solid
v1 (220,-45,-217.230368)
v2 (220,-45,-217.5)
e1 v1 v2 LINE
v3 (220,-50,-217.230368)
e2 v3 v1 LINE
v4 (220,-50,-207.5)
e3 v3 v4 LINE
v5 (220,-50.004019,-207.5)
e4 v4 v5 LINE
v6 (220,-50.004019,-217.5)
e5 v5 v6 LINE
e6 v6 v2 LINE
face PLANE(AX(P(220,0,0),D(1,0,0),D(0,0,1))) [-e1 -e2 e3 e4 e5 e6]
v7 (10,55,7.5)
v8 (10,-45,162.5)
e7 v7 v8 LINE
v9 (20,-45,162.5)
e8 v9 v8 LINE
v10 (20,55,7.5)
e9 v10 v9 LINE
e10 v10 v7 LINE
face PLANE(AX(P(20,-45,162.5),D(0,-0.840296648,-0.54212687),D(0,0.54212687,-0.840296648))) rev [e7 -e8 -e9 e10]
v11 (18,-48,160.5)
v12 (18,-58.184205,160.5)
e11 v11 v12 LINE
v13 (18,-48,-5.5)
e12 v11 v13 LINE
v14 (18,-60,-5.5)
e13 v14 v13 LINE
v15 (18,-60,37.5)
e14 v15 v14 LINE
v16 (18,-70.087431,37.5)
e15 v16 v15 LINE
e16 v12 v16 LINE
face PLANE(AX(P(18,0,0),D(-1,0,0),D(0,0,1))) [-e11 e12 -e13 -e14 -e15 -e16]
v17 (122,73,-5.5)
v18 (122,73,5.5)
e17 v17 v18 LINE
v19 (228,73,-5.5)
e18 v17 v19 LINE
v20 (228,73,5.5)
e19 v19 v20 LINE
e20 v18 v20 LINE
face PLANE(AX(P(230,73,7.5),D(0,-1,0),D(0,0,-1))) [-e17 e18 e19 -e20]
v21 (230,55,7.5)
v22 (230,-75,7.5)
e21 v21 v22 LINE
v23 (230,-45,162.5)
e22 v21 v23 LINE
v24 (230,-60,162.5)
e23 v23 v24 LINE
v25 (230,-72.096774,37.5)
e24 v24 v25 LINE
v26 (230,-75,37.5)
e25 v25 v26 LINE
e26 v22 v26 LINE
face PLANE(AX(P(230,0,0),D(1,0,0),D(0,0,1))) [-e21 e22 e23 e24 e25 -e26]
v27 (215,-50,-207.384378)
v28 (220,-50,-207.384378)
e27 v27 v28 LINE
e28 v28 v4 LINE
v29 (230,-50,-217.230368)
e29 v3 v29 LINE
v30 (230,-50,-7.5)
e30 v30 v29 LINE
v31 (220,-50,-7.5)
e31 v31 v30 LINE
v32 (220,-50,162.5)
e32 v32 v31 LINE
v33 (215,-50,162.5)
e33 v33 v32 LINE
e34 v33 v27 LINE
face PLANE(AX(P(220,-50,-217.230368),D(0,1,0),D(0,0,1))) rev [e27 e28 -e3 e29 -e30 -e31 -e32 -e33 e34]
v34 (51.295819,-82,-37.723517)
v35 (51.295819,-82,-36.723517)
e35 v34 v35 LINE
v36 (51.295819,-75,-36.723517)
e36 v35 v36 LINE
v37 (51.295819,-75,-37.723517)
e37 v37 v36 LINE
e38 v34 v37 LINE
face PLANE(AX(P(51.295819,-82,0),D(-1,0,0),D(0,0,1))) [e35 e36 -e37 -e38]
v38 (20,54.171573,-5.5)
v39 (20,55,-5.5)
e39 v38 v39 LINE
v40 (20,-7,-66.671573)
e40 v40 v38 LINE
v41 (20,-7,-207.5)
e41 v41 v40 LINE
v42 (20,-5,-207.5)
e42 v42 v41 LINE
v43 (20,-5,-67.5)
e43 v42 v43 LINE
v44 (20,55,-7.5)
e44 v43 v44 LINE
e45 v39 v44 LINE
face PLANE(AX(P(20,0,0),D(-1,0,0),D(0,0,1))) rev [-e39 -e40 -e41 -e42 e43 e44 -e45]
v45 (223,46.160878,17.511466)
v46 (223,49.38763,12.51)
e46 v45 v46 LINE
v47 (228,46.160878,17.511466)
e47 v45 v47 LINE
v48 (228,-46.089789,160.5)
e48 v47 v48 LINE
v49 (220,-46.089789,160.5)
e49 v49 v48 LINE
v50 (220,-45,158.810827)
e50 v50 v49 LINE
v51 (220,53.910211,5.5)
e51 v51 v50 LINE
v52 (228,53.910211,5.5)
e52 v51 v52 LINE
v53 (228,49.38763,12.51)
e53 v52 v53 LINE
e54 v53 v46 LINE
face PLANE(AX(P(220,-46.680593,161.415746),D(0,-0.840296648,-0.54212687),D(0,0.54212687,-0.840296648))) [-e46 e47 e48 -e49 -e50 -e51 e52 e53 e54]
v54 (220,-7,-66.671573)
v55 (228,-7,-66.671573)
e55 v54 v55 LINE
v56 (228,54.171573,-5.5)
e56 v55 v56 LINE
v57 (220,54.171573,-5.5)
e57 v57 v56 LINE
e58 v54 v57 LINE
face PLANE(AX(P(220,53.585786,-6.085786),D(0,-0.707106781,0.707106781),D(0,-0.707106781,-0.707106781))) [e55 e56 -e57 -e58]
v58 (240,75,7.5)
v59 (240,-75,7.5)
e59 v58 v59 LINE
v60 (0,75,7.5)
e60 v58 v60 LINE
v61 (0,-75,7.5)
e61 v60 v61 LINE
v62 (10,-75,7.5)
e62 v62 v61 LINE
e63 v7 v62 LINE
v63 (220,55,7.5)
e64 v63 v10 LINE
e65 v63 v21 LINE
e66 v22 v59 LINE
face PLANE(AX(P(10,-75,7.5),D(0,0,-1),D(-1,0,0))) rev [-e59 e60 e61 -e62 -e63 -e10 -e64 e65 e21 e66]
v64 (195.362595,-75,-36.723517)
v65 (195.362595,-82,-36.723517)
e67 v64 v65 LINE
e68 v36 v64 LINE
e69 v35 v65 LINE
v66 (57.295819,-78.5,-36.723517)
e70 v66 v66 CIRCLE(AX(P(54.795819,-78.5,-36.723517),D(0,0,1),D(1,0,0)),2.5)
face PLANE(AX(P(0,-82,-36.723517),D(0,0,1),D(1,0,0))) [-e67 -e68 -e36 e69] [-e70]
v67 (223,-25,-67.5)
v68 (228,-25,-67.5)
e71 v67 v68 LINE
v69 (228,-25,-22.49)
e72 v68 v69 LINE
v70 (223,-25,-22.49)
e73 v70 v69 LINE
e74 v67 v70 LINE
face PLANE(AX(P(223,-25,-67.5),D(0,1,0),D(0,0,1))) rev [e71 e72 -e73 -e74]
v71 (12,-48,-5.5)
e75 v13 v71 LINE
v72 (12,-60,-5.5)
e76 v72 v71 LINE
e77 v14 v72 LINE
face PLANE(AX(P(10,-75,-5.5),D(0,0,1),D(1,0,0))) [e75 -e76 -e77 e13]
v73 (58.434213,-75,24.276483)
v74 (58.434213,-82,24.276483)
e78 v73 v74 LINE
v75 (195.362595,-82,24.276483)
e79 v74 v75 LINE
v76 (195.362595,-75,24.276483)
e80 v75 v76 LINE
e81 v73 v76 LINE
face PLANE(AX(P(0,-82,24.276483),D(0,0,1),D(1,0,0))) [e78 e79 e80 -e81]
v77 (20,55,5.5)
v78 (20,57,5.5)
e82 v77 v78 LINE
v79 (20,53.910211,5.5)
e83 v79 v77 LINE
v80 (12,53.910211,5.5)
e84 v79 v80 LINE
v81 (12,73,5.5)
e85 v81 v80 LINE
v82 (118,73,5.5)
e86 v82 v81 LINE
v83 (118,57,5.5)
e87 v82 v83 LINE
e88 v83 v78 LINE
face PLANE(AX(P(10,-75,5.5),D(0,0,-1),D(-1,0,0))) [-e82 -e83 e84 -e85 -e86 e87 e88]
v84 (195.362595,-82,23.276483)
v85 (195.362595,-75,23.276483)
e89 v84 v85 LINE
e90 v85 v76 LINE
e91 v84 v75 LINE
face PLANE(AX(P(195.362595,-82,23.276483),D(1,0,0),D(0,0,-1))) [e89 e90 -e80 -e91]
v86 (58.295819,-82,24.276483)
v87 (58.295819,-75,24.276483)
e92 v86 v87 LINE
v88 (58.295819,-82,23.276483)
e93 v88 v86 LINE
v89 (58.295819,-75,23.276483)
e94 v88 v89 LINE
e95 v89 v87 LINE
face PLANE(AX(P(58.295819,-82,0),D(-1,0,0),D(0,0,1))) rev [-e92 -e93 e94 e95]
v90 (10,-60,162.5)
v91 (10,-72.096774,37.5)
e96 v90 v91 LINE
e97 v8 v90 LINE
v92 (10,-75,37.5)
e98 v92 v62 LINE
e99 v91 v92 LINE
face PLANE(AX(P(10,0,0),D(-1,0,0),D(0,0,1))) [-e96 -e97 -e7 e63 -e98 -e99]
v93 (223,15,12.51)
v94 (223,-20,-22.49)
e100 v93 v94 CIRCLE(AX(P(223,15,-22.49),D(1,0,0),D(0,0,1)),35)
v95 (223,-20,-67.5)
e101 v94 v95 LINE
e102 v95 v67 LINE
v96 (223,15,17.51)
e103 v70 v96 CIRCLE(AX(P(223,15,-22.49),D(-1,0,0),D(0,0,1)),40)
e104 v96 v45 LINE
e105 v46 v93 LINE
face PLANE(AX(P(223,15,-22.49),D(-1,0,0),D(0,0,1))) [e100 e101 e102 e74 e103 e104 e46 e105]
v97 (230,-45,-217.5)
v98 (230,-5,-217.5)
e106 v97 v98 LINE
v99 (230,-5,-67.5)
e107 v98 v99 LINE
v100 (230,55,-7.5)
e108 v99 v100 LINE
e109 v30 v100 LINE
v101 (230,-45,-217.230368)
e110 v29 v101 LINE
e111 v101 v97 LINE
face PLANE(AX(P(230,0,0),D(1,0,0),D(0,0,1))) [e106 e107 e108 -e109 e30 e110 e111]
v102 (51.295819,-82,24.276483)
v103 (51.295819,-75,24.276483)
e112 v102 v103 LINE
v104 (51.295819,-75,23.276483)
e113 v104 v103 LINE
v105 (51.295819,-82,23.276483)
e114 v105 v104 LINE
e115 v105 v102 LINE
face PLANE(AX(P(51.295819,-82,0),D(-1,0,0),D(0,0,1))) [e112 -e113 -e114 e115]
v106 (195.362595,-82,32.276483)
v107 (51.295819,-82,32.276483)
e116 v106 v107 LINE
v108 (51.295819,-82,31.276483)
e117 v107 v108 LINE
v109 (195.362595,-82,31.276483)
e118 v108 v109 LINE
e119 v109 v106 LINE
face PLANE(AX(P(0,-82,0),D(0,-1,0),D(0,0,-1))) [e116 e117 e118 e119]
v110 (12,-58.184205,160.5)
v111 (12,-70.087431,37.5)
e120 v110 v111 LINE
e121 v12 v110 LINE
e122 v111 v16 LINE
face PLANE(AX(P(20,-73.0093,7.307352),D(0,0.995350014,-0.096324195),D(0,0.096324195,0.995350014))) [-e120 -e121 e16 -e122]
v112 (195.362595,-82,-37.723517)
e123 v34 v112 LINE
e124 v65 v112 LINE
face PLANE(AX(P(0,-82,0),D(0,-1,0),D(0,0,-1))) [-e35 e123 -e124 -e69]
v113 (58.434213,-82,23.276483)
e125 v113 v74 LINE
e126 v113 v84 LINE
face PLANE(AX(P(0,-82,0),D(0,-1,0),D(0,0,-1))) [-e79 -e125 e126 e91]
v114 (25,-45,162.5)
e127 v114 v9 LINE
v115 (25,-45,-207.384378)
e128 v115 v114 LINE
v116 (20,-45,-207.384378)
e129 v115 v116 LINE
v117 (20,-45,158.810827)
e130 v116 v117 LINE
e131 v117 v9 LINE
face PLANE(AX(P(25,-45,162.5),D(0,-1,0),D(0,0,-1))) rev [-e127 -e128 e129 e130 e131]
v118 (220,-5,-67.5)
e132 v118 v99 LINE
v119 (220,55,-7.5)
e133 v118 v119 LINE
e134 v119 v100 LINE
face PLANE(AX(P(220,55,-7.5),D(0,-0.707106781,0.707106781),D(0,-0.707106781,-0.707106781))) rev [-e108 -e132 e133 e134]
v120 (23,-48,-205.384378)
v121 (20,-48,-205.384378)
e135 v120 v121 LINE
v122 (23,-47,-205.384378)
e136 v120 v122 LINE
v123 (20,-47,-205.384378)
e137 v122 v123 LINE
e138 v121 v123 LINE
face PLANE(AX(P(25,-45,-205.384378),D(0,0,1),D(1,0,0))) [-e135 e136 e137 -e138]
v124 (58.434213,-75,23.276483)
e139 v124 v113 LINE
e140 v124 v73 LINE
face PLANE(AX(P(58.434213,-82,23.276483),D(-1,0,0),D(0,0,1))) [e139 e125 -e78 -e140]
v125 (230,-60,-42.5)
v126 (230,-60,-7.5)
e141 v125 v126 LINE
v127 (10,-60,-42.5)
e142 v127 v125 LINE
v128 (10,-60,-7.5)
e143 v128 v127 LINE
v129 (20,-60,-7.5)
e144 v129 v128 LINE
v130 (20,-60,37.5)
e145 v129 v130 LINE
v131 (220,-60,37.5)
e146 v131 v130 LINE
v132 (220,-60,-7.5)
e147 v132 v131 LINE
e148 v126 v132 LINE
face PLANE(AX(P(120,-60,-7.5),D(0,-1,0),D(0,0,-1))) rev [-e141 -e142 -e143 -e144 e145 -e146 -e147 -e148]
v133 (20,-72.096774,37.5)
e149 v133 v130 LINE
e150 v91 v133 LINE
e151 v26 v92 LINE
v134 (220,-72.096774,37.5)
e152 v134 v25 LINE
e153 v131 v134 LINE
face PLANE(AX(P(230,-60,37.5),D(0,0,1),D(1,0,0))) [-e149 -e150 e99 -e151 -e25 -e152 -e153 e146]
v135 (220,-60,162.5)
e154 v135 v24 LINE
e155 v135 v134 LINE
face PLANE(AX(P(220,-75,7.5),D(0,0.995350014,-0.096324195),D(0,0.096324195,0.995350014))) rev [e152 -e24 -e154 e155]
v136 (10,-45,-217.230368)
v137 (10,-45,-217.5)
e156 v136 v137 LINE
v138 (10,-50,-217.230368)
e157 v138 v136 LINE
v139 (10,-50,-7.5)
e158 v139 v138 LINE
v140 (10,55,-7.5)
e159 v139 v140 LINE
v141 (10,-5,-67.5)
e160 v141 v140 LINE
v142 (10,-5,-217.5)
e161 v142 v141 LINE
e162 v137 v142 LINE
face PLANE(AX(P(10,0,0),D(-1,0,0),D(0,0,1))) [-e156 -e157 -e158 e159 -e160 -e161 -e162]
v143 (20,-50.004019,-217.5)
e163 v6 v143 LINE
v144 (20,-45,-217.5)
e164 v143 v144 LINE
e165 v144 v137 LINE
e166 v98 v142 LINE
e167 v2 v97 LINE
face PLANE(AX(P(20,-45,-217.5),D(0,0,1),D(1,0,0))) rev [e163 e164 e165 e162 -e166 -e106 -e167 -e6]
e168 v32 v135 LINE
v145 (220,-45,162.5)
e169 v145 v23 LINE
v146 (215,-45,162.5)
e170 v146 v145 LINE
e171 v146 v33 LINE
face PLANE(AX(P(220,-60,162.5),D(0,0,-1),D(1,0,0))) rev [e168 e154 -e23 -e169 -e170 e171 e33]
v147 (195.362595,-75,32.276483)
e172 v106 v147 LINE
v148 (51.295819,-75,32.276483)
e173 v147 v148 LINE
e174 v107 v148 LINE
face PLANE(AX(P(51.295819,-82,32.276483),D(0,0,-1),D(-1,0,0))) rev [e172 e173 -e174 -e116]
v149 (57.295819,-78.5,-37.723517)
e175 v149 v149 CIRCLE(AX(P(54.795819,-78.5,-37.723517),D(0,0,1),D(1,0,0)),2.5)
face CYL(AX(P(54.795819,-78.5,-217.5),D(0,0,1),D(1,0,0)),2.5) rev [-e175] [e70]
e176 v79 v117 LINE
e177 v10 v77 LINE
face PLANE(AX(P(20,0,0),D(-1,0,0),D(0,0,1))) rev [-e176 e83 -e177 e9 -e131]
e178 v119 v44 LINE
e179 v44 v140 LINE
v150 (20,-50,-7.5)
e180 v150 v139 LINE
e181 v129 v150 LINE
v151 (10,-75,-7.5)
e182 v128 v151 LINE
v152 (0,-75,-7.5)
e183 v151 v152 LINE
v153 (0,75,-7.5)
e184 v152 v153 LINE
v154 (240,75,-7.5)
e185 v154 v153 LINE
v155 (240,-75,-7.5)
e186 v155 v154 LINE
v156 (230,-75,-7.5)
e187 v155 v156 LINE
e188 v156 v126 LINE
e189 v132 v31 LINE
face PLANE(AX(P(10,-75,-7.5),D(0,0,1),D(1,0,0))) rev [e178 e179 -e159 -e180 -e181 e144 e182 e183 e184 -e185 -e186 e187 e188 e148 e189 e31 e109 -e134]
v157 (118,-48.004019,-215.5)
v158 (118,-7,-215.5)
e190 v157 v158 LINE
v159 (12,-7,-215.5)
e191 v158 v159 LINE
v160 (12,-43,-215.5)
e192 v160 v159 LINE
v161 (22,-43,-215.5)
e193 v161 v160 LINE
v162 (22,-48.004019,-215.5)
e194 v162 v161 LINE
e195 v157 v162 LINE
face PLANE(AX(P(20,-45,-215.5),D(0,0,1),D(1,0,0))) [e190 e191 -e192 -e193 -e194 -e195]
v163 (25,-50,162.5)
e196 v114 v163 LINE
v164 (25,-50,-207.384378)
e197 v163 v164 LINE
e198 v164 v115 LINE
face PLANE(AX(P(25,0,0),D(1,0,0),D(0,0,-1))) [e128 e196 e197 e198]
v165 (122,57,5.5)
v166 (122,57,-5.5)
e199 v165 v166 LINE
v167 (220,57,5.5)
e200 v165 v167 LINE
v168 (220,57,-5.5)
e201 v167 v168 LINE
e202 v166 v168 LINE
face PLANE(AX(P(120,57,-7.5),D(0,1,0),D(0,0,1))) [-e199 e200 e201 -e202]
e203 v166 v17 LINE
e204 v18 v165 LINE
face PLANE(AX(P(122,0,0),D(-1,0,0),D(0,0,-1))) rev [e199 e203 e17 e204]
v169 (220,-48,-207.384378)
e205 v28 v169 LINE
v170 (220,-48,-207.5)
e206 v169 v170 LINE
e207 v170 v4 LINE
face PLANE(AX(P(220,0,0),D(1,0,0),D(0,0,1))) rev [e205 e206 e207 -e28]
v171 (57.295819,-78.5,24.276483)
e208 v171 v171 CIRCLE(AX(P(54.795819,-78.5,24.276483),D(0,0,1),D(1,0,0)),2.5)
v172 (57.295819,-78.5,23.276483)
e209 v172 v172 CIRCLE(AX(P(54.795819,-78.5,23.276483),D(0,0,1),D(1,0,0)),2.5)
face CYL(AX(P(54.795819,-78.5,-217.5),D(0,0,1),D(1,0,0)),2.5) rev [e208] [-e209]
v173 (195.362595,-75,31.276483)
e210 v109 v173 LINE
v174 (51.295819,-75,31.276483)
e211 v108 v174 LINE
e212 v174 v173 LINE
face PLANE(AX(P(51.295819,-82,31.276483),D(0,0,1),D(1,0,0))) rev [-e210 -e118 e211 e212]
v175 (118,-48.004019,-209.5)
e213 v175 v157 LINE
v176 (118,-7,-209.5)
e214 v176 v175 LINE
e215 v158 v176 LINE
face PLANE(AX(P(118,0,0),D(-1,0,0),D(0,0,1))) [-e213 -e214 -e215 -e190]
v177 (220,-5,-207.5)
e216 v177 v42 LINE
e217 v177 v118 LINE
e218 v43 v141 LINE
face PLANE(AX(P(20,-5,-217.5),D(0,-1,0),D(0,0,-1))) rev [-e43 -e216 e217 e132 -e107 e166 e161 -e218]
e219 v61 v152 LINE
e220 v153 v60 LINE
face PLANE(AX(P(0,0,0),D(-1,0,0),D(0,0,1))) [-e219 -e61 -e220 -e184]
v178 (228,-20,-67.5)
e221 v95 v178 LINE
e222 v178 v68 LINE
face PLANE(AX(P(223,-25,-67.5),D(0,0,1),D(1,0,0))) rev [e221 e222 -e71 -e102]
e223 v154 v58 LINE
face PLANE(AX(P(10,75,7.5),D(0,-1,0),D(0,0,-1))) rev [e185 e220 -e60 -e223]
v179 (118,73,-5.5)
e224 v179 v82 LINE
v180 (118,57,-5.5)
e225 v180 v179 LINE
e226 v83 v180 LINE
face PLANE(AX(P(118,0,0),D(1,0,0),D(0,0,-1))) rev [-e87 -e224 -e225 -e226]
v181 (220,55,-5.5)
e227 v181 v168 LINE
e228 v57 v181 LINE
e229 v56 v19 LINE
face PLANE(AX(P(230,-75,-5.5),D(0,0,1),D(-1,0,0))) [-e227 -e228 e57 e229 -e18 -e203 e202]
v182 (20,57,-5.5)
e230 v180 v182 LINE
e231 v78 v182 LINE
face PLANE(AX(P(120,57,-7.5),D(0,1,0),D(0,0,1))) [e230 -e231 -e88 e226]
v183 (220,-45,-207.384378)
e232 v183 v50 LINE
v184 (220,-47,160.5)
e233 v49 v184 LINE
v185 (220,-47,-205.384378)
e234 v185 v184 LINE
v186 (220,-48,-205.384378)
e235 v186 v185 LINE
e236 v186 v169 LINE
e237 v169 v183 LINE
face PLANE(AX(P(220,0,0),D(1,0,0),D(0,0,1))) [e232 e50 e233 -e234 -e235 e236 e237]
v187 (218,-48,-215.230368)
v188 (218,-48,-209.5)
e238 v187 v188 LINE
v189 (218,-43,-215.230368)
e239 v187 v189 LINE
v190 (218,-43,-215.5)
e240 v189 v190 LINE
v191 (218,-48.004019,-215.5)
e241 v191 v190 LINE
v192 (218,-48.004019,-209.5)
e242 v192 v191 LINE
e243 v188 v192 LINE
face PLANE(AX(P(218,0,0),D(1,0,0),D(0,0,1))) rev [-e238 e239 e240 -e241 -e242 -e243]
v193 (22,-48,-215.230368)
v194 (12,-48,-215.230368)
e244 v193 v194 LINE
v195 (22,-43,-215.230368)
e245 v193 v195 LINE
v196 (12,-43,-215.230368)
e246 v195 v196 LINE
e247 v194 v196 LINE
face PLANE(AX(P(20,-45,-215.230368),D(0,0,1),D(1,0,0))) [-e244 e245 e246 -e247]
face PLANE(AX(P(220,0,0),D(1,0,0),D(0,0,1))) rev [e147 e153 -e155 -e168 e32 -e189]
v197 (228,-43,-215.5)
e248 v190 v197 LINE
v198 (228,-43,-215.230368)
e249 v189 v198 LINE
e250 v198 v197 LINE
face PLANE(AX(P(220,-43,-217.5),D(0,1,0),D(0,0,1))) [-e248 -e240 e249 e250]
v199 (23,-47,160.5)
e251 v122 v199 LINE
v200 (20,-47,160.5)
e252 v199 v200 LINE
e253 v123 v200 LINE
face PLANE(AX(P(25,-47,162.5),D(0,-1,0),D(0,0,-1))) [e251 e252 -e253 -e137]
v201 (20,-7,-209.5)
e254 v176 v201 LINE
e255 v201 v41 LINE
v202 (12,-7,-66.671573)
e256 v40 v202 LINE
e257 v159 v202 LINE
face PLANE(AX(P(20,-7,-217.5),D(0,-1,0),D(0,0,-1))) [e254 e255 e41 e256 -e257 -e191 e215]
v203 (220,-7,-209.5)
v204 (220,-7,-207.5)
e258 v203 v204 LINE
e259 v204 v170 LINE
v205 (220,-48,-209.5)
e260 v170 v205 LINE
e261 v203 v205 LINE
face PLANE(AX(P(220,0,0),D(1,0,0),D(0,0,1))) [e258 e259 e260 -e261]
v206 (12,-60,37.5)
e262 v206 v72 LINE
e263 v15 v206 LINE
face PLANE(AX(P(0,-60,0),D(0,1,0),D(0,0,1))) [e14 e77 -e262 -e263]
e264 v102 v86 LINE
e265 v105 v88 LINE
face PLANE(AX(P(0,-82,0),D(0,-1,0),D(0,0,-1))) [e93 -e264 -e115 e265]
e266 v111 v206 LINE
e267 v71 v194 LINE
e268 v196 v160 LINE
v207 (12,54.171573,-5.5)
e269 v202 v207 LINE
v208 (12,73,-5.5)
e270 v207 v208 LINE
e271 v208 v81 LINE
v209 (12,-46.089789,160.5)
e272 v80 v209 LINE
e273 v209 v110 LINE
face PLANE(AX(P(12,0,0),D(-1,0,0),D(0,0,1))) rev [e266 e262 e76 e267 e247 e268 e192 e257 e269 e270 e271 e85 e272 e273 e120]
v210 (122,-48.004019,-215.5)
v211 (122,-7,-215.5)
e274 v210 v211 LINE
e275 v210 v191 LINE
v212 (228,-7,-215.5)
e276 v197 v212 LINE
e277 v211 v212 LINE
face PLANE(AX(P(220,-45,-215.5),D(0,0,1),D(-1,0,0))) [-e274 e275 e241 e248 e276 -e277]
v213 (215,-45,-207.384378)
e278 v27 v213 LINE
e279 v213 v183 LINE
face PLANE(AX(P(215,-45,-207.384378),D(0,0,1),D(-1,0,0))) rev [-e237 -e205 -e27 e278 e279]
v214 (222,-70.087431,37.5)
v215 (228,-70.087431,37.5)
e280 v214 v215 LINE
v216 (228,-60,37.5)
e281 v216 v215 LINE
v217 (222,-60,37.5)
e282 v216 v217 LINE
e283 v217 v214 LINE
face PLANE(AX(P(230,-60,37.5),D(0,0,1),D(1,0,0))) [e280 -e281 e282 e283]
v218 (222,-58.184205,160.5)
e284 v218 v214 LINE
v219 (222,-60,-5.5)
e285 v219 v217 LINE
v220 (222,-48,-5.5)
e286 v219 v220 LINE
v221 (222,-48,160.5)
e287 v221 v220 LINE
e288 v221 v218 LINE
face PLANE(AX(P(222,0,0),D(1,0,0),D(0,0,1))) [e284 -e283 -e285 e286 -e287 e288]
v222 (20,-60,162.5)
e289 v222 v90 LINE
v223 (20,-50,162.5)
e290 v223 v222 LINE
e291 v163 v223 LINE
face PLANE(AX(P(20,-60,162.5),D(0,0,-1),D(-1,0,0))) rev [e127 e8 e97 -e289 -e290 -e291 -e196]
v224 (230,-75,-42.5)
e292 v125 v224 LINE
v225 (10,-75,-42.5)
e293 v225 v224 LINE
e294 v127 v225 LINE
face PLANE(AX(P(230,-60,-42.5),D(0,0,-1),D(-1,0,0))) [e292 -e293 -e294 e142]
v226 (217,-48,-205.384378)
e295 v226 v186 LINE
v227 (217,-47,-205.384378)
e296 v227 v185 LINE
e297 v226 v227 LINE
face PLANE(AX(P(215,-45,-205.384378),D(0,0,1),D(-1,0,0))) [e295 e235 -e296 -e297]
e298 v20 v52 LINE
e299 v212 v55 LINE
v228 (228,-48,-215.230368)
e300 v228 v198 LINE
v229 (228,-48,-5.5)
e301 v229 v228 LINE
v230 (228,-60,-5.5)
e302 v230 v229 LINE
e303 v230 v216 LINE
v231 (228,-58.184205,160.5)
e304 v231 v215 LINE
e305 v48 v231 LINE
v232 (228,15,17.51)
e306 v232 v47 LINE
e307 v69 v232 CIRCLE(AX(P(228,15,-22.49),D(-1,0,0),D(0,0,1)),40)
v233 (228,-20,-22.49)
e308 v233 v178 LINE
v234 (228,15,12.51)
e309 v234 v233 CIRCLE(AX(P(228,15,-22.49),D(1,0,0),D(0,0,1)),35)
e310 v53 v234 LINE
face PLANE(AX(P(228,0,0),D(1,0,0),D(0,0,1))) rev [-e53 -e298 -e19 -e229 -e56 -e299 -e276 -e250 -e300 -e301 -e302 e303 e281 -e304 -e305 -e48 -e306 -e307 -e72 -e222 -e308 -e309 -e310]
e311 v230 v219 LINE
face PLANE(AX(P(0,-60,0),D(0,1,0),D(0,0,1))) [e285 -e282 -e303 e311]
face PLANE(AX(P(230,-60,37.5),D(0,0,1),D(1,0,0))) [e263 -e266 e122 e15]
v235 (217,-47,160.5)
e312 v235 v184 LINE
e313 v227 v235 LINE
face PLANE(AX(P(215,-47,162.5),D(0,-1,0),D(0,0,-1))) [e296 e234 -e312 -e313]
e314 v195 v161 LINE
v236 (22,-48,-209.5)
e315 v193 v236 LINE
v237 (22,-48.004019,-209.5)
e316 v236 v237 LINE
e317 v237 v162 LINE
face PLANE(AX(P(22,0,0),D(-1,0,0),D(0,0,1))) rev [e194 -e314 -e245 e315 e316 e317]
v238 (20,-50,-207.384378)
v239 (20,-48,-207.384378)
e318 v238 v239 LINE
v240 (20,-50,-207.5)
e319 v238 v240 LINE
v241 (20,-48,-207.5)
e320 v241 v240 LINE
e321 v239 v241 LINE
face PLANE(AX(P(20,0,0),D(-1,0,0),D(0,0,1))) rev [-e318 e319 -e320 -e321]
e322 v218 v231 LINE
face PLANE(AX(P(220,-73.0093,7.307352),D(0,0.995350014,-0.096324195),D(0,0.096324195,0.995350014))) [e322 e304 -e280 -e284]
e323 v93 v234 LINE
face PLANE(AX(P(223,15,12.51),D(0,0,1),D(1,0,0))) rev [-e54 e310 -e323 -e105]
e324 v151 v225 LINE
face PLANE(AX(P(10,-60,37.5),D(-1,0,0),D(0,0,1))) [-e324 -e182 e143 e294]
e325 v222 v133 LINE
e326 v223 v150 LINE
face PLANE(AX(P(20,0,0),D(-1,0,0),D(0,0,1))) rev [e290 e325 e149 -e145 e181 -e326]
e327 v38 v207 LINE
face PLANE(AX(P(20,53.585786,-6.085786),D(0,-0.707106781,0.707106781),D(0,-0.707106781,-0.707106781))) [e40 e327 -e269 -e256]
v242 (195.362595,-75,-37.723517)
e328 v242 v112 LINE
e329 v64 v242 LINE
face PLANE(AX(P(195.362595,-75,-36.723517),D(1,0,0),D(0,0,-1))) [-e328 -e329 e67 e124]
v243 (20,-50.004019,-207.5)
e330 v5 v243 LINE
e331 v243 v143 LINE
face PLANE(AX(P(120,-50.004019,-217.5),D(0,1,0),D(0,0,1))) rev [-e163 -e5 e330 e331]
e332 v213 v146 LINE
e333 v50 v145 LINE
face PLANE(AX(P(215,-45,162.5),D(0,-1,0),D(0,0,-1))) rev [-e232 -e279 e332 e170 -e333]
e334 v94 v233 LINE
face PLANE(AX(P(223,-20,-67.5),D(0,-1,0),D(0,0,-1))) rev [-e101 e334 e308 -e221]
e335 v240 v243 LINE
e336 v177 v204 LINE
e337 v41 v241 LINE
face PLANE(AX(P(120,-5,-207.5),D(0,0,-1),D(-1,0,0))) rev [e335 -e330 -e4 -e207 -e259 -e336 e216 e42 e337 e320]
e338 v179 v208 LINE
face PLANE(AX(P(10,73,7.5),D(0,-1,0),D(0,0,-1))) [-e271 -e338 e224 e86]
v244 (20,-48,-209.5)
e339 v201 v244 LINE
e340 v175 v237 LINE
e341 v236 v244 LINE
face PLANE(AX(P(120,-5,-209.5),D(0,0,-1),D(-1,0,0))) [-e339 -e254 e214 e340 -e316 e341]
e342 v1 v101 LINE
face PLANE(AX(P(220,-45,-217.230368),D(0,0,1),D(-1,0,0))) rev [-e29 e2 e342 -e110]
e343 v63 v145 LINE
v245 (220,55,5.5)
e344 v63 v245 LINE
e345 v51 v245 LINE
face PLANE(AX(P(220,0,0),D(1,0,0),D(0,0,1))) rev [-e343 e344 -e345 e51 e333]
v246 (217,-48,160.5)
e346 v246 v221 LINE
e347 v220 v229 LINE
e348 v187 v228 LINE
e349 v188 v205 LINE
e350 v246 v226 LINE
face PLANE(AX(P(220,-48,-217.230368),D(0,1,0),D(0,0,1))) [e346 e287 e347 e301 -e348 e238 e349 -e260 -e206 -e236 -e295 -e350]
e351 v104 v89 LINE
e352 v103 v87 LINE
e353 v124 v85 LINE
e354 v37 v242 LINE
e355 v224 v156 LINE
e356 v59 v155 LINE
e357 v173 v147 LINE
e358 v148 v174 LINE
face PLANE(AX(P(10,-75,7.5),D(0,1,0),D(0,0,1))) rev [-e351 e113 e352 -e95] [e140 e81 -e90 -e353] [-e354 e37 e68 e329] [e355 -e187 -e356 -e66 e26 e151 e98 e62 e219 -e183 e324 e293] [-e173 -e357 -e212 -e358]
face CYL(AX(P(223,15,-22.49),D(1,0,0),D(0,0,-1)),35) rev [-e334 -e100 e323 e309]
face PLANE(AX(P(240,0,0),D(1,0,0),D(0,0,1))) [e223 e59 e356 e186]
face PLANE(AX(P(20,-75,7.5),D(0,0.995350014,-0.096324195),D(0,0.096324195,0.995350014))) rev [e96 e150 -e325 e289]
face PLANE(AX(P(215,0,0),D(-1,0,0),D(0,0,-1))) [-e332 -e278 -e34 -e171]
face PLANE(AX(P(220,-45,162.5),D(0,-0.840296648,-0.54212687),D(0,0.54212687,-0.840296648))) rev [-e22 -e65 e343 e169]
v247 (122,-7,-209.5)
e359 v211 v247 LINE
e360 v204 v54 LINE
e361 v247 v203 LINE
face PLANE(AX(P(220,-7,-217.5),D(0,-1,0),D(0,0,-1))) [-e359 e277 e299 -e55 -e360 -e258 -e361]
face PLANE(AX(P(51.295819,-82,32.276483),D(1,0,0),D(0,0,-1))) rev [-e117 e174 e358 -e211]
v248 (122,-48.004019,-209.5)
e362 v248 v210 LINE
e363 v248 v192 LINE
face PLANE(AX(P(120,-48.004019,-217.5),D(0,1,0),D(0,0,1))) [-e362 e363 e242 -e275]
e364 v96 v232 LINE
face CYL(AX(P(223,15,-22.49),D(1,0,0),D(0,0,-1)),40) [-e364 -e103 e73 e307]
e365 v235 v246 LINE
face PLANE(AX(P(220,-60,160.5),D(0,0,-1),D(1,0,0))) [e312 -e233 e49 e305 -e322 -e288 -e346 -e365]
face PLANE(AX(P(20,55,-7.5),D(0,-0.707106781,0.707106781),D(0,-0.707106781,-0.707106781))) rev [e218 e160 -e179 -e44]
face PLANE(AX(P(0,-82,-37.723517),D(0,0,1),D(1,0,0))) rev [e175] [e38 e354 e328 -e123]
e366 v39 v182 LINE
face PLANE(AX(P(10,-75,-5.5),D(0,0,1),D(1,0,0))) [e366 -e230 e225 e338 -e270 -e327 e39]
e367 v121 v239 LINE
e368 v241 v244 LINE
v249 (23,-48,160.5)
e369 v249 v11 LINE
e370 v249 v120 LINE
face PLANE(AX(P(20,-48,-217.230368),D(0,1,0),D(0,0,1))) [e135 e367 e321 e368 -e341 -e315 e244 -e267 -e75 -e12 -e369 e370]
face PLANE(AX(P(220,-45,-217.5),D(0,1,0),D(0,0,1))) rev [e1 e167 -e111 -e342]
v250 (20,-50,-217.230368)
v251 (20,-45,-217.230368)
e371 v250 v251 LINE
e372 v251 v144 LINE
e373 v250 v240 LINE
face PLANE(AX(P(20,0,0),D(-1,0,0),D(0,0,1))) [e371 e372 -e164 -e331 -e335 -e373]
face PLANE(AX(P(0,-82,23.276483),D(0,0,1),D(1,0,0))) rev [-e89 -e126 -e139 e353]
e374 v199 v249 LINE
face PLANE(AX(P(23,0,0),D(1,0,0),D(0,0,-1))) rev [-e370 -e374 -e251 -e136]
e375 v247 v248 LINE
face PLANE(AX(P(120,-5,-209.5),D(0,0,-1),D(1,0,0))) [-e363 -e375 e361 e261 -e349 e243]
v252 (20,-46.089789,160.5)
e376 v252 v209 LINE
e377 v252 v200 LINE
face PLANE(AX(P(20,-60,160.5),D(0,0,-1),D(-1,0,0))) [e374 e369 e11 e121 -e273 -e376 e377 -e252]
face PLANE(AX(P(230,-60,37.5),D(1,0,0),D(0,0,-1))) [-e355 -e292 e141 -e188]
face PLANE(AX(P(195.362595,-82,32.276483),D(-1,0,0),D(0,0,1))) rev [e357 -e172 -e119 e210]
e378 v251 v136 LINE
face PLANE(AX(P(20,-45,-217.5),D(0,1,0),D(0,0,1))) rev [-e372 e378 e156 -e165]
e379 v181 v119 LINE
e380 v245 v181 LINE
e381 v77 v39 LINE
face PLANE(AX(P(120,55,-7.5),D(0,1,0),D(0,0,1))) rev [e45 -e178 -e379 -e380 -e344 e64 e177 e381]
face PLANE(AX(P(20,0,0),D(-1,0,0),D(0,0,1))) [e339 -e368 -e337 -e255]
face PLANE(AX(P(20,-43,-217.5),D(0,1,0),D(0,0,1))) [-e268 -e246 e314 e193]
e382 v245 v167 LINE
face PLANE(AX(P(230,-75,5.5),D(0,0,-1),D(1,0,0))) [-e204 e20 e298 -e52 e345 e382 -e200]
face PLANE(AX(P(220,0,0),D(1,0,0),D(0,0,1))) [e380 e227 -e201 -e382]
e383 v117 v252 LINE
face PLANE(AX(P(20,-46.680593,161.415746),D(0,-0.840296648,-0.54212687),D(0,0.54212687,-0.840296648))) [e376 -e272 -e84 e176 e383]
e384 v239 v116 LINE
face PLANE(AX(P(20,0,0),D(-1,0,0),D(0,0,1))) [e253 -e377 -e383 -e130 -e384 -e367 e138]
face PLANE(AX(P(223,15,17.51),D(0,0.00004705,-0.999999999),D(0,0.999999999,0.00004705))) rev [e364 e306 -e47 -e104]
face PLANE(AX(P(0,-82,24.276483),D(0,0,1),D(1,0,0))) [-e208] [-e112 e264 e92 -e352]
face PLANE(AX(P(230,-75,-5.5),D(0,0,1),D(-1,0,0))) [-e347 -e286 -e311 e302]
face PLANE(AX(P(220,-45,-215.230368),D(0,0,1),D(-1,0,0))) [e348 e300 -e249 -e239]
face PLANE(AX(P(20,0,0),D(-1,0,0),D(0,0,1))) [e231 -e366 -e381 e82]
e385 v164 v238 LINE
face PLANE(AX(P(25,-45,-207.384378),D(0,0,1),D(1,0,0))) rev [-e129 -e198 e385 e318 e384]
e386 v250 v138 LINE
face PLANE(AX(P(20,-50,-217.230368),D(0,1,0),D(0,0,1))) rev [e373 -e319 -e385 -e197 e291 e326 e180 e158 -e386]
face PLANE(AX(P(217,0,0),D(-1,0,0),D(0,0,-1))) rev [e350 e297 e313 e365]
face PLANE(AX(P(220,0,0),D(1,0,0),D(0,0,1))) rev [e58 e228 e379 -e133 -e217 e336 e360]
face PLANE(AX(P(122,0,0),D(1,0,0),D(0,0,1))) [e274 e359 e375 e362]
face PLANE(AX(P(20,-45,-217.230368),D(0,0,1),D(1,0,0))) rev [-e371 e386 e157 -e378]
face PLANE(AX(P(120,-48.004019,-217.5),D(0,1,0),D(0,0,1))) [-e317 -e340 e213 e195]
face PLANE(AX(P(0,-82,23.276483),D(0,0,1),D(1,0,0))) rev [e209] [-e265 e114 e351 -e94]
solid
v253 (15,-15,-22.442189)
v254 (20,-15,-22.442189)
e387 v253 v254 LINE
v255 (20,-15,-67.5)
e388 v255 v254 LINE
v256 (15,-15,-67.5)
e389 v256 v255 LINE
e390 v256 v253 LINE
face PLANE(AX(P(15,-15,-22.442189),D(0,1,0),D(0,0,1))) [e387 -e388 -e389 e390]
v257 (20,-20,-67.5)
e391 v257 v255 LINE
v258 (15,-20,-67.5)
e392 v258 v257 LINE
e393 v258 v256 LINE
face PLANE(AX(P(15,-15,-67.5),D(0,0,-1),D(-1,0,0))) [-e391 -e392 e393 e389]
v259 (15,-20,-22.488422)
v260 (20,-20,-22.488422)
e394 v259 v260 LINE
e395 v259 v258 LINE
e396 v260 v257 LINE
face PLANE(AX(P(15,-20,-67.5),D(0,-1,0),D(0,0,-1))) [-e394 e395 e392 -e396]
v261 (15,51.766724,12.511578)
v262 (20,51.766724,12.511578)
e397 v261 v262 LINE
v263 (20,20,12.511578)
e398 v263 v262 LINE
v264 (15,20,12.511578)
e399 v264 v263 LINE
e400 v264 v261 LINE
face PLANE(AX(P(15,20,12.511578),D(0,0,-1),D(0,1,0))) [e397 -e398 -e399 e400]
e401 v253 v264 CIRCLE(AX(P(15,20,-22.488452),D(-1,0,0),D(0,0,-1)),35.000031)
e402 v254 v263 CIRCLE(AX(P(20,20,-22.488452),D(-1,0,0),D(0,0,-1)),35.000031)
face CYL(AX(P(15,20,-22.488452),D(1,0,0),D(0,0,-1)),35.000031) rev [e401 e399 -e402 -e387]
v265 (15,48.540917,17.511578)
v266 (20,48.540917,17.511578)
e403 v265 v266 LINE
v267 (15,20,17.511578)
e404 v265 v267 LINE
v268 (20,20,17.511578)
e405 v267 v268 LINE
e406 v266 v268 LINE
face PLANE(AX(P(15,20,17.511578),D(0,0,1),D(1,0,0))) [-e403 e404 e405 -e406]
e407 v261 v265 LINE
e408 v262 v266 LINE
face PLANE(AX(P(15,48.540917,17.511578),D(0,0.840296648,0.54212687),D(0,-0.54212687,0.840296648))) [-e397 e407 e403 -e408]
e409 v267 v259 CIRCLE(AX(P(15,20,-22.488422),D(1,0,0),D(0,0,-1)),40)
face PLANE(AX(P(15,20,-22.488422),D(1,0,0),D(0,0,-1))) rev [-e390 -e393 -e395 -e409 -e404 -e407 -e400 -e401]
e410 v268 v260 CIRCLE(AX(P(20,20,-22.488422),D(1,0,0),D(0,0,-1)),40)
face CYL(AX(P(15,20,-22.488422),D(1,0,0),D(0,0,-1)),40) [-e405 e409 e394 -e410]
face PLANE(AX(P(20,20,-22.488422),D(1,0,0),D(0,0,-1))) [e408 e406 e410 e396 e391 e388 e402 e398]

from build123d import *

# Parameters (mm, degrees)
CROQUIS2_W               = 15
CROQUIS2_H               = 150
SALIENTE_EXTRUIR1_DEPTH  = 10
SALIENTE_EXTRUIR2_DEPTH  = 10
CROQUIS5_W               = 15
CROQUIS5_H               = 15
CROQUIS5_H_2             = 20
CROQUIS5_W_2             = 10
CROQUIS5_H_3             = 45.004018959
SALIENTE_EXTRUIR3_DEPTH  = 100
CROQUIS6_W               = 369.884378223
CROQUIS6_H               = 5
SALIENTE_EXTRUIR6_DEPTH  = 5
VACIADO1_START           = 12
VACIADO1_OUTLINE_W       = 11
VACIADO1_OUTLINE_H       = 11
VACIADO1_DEPTH           = 8
VACIADO1_START_2         = 20
VACIADO1_2_OUTLINE_W     = 16
VACIADO1_2_OUTLINE_H     = 11
VACIADO1_2_OUTLINE_W_2   = 11
VACIADO1_2_DEPTH         = 98
VACIADO1_3_DEPTH         = 6
VACIADO1_START_3         = 2
VACIADO1_4_OUTLINE_W     = 146
VACIADO1_4_OUTLINE_H     = 11
VACIADO1_4_DEPTH         = 10
VACIADO1_5_OUTLINE_W     = 1
VACIADO1_5_OUTLINE_H     = 365.884378223
VACIADO1_5_DEPTH         = 3
VACIADO1_START_4         = 22
VACIADO1_6_DEPTH         = 96
SALIENTE_EXTRUIR7_DEPTH  = 5
CROQUIS8_W               = 15
CROQUIS8_H               = 150
SALIENTE_EXTRUIR8_DEPTH  = 10
SIMETR_A8_START          = 228
SIMETR_A8_DEPTH          = 2
SIMETR_A8_START_2        = 120
SIMETR_A8_2_OUTLINE_W    = 20
SIMETR_A8_2_OUTLINE_H    = 15
SIMETR_A8_2_OUTLINE_W_2  = 16
SIMETR_A8_2_OUTLINE_H_2  = 11
SIMETR_A8_2_OUTLINE_W_3  = 15
SIMETR_A8_2_OUTLINE_W_4  = 11
SIMETR_A8_2_OUTLINE_W_5  = 45.004018959
SIMETR_A8_2_OUTLINE_H_3  = 10
SIMETR_A8_2_OUTLINE_W_6  = 41.004018959
SIMETR_A8_2_OUTLINE_H_4  = 6
SIMETR_A8_2_DEPTH        = 100
SIMETR_A8_START_3        = 230
SIMETR_A8_3_OUTLINE_W    = 150
SIMETR_A8_3_OUTLINE_H    = 15
SIMETR_A8_3_DEPTH        = 10
SIMETR_A8_START_4        = 220
SIMETR_A8_4_DEPTH        = 8
SIMETR_A8_START_5        = 215
SIMETR_A8_5_OUTLINE_W    = 5
SIMETR_A8_5_OUTLINE_H    = 369.884378223
SIMETR_A8_5_OUTLINE_W_2  = 1
SIMETR_A8_5_OUTLINE_H_2  = 365.884378223
SIMETR_A8_5_DEPTH        = 5
SIMETR_A8_6_DEPTH        = 2
SIMETR_A8_7_OUTLINE_W    = 16
SIMETR_A8_7_OUTLINE_H    = 11
SIMETR_A8_7_OUTLINE_W_2  = 11
SIMETR_A8_7_OUTLINE_W_3  = 41.004018959
SIMETR_A8_7_OUTLINE_H_2  = 6
SIMETR_A8_7_DEPTH        = 2
SIMETR_A8_8_OUTLINE_W    = 1
SIMETR_A8_8_OUTLINE_H    = 365.884378223
SIMETR_A8_8_DEPTH        = 2
SIMETR_A8_START_6        = 218
SIMETR_A8_9_DEPTH        = 2
SALIENTE_EXTRUIR9_DEPTH  = 5
CROQUIS10_W              = 220
CROQUIS10_H              = 80
SALIENTE_EXTRUIR10_DEPTH = 15
CROQUIS11_W              = 7
CROQUIS11_H              = 1
SALIENTE_EXTRUIR11_DEPTH = 7
CROQUIS12_R              = 2.5
CORTAR_EXTRUIR1_DEPTH    = 351.399583266
CROQUIS13_W              = 137.06677635
CROQUIS13_H              = 7
SALIENTE_EXTRUIR13_DEPTH = 1
CROQUIS14_W              = 136.928381549
CROQUIS14_H              = 7
SALIENTE_EXTRUIR14_DEPTH = 1
CROQUIS15_W              = 144.06677635
CROQUIS15_H              = 1
SALIENTE_EXTRUIR15_DEPTH = 7


# Read off the part's stored shape, not the designer's step: Vaciado1, Simetría8
with BuildPart() as part:
    # Croquis2 → Saliente-Extruir1 (new body)
    with BuildSketch(Plane(origin=(0, 0, 0), x_dir=(0, 0, -1), z_dir=(1, 0, 0))):
        Rectangle(CROQUIS2_W, CROQUIS2_H)
    extrude(amount=SALIENTE_EXTRUIR1_DEPTH)

    # Croquis3 → Saliente-Extruir2 (add)
    with BuildSketch(Plane(origin=(10, 0, 0), x_dir=(0, 0, -1), z_dir=(1, 0, 0))):
        Polygon((-7.5, -75), (-162.5, -60), (-162.5, -45), (-7.5, 55), (-7.5, 75), (7.5, 75), (7.5, 55), (67.5, -5), (217.5, -5), (217.5, -45), (217.230368445, -45), (217.230368445, -50), (7.5, -50), (7.5, -75), align=None)
    extrude(amount=SALIENTE_EXTRUIR2_DEPTH)

    # Croquis5 → Saliente-Extruir3 (add)
    with BuildSketch(Plane(origin=(20, 0, 0), x_dir=(0, 0, -1), z_dir=(1, 0, 0))):
        with Locations((0, -67.5)):
            Rectangle(CROQUIS5_W, CROQUIS5_H)
        with Locations((0, 65)):
            Rectangle(CROQUIS5_W, CROQUIS5_H_2)
        with Locations((212.5, -27.502009479)):
            Rectangle(CROQUIS5_W_2, CROQUIS5_H_3)
    extrude(amount=SALIENTE_EXTRUIR3_DEPTH)

    # Croquis6 → Saliente-Extruir6 (add)
    with BuildSketch(Plane(origin=(20, 0, 0), x_dir=(0, 0, -1), z_dir=(1, 0, 0))):
        with Locations((22.442189111, -47.5)):
            Rectangle(CROQUIS6_W, CROQUIS6_H)
    extrude(amount=SALIENTE_EXTRUIR6_DEPTH)

    # Vaciado1 outline → Vaciado1 (cut)
    with BuildSketch(Plane.YZ.offset(VACIADO1_START)):
        Polygon((73, -5.5), (73, 5.5), (53.910210742, 5.5), (-46.089789258, 160.5), (-48, 160.5), (-48, -215.230368445), (-43, -215.230368445), (-43, -215.5), (-7, -215.5), (-7, -66.671572875), (54.171572875, -5.5), align=None)
        with Locations((-67.5, 0)):
            Rectangle(VACIADO1_OUTLINE_W, VACIADO1_OUTLINE_H)
    extrude(amount=VACIADO1_DEPTH, mode=Mode.SUBTRACT)

    # Vaciado1 2 outline → Vaciado1 2 (cut)
    with BuildSketch(Plane.YZ.offset(VACIADO1_START_2)):
        with Locations((65, 0)):
            Rectangle(VACIADO1_2_OUTLINE_W, VACIADO1_2_OUTLINE_H)
        Polygon((-7, -215.5), (-7, -209.5), (-48, -209.5), (-48, -215.230368445), (-43, -215.230368445), (-43, -215.5), align=None)
        with Locations((-67.5, 0)):
            Rectangle(VACIADO1_2_OUTLINE_W_2, VACIADO1_2_OUTLINE_H)
    extrude(amount=VACIADO1_2_DEPTH, mode=Mode.SUBTRACT)

    # Vaciado1 3 outline → Vaciado1 3 (cut)
    with BuildSketch(Plane.YZ.offset(VACIADO1_START)):
        Polygon((-62, -5.5), (-48, -5.5), (-48, 160.5), (-58.184204967, 160.5), (-73, 7.40345133), (-73, 5.5), (-62, 5.5), align=None)
    extrude(amount=VACIADO1_3_DEPTH, mode=Mode.SUBTRACT)

    # Vaciado1 4 outline → Vaciado1 4 (cut)
    with BuildSketch(Plane.YZ.offset(VACIADO1_START_3)):
        Rectangle(VACIADO1_4_OUTLINE_W, VACIADO1_4_OUTLINE_H)
    extrude(amount=VACIADO1_4_DEPTH, mode=Mode.SUBTRACT)

    # Vaciado1 5 outline → Vaciado1 5 (cut)
    with BuildSketch(Plane.YZ.offset(VACIADO1_START_2)):
        with Locations((-47.5, -22.442189111)):
            Rectangle(VACIADO1_5_OUTLINE_W, VACIADO1_5_OUTLINE_H)
    extrude(amount=VACIADO1_5_DEPTH, mode=Mode.SUBTRACT)

    # Vaciado1 6 outline → Vaciado1 6 (cut)
    with BuildSketch(Plane.YZ.offset(VACIADO1_START_4)):
        Polygon((-48, -215.230368445), (-48, -209.5), (-48.004018959, -209.5), (-48.004018959, -215.5), (-43, -215.5), (-43, -215.230368445), align=None)
    extrude(amount=VACIADO1_6_DEPTH, mode=Mode.SUBTRACT)

    # Croquis8 → Saliente-Extruir8 (add)
    with BuildSketch(Plane(origin=(12, 0, 0), x_dir=(0, 0, -1), z_dir=(1, 0, 0))):
        Rectangle(CROQUIS8_W, CROQUIS8_H)
    extrude(amount=-SALIENTE_EXTRUIR8_DEPTH)

    # Simetr_a8 2 outline → Simetr_a8 2 (add)
    # profile 1 of 3: a face of its own
    with BuildSketch(Plane.YZ.offset(SIMETR_A8_START_2)):
        with Locations((65, 0)):
            Rectangle(SIMETR_A8_2_OUTLINE_W, SIMETR_A8_2_OUTLINE_H)
        with Locations((65, 0)):
            Rectangle(SIMETR_A8_2_OUTLINE_W_2, SIMETR_A8_2_OUTLINE_H_2, mode=Mode.SUBTRACT)
    # profile 2 of 3: a face of its own
    with BuildSketch(Plane.YZ.offset(SIMETR_A8_START_2)):
        with Locations((-67.5, 0)):
            Rectangle(SIMETR_A8_2_OUTLINE_W_3, SIMETR_A8_2_OUTLINE_H)
        with Locations((-67.5, 0)):
            Rectangle(SIMETR_A8_2_OUTLINE_W_4, SIMETR_A8_2_OUTLINE_H_2, mode=Mode.SUBTRACT)
    # profile 3 of 3: a face of its own
    with BuildSketch(Plane.YZ.offset(SIMETR_A8_START_2)):
        with Locations((-27.502009479, -212.5)):
            Rectangle(SIMETR_A8_2_OUTLINE_W_5, SIMETR_A8_2_OUTLINE_H_3)
        with Locations((-27.502009479, -212.5)):
            Rectangle(SIMETR_A8_2_OUTLINE_W_6, SIMETR_A8_2_OUTLINE_H_4, mode=Mode.SUBTRACT)
    extrude(amount=SIMETR_A8_2_DEPTH)



with BuildPart() as body_2:
    # Croquis7 → Saliente-Extruir7 (new body)
    with BuildSketch(Plane(origin=(20, 0, 0), x_dir=(0, 0, -1), z_dir=(1, 0, 0))):
        with BuildLine():
            Line((-17.511578112, 20), (-17.511578112, 48.540917347))
            Line((-17.511578112, 48.540917347), (-12.511578112, 51.766723799))
            Line((-12.511578112, 51.766723799), (-12.511578112, 20))
            ThreePointArc((-12.511578112, 20), (-2.276657661, -4.732396988), (22.442189111, -15))
            Line((22.442189111, -15), (67.5, -15))
            Line((67.5, -15), (67.5, -20))
            Line((67.5, -20), (22.488421888, -20))
            ThreePointArc((22.488421888, -20), (-5.795849359, -8.284271247), (-17.511578112, 20))
        make_face()
    extrude(amount=-SALIENTE_EXTRUIR7_DEPTH)


with BuildPart() as body_3:
    # Simetría8 outline → Simetría8 (new body)
    with BuildSketch(Plane.YZ.offset(SIMETR_A8_START)):
        Polygon((-45, 162.5), (-60, 162.5), (-75, 7.5), (-75, -7.5), (-50, -7.5), (-50, -217.230368445), (-45, -217.230368445), (-45, -217.5), (-5, -217.5), (-5, -67.5), (55, -7.5), (75, -7.5), (75, 7.5), (55, 7.5), align=None)
    extrude(amount=SIMETR_A8_DEPTH)

    # Simetr_a8 3 outline → Simetr_a8 3 (add)
    with BuildSketch(Plane.YZ.offset(SIMETR_A8_START_3)):
        Rectangle(SIMETR_A8_3_OUTLINE_W, SIMETR_A8_3_OUTLINE_H)
    extrude(amount=SIMETR_A8_3_DEPTH)


with BuildPart() as part_1:
    add(part.part)

    add(body_3.part)  # Simetr_a8 4 merges body 3
    # Simetr_a8 4 outline → Simetr_a8 4 (add)
    with BuildSketch(Plane.YZ.offset(SIMETR_A8_START_4)):
        Polygon((-45, 162.5), (-60, 162.5), (-75, 7.5), (-75, -7.5), (-50, -7.5), (-50, -217.230368445), (-45, -217.230368445), (-45, -217.5), (-5, -217.5), (-5, -67.5), (55, -7.5), (75, -7.5), (75, 7.5), (55, 7.5), align=None)
        Polygon((-46.089789258, 160.5), (53.910210742, 5.5), (73, 5.5), (73, -5.5), (54.171572875, -5.5), (-7, -66.671572875), (-7, -215.5), (-43, -215.5), (-43, -215.230368445), (-48, -215.230368445), (-48, -5.5), (-73, -5.5), (-73, 7.40345133), (-58.184204967, 160.5), align=None, mode=Mode.SUBTRACT)
    extrude(amount=SIMETR_A8_4_DEPTH)

    # Simetr_a8 5 outline → Simetr_a8 5 (add)
    with BuildSketch(Plane.YZ.offset(SIMETR_A8_START_5)):
        with Locations((-47.5, -22.442189111)):
            Rectangle(SIMETR_A8_5_OUTLINE_W, SIMETR_A8_5_OUTLINE_H)
        with Locations((-47.5, -22.442189111)):
            Rectangle(SIMETR_A8_5_OUTLINE_W_2, SIMETR_A8_5_OUTLINE_H_2, mode=Mode.SUBTRACT)
    extrude(amount=SIMETR_A8_5_DEPTH)

    # Simetr_a8 6 outline → Simetr_a8 6 (add)
    with BuildSketch(Plane.YZ.offset(SIMETR_A8_START_4)):
        Polygon((-48, 160.5), (-58.184204967, 160.5), (-73, 7.40345133), (-73, 5.5), (-62, 5.5), (-62, -5.5), (-48, -5.5), align=None)
    extrude(amount=SIMETR_A8_6_DEPTH)

    # Simetr_a8 7 outline → Simetr_a8 7 (add)
    with BuildSketch(Plane.YZ.offset(SIMETR_A8_START_2)):
        with Locations((65, 0)):
            Rectangle(SIMETR_A8_7_OUTLINE_W, SIMETR_A8_7_OUTLINE_H)
        with Locations((-67.5, 0)):
            Rectangle(SIMETR_A8_7_OUTLINE_W_2, SIMETR_A8_7_OUTLINE_H)
        with Locations((-27.502009479, -212.5)):
            Rectangle(SIMETR_A8_7_OUTLINE_W_3, SIMETR_A8_7_OUTLINE_H_2)
    extrude(amount=SIMETR_A8_7_DEPTH)

    # Simetr_a8 8 outline → Simetr_a8 8 (add)
    with BuildSketch(Plane.YZ.offset(SIMETR_A8_START_5)):
        with Locations((-47.5, -22.442189111)):
            Rectangle(SIMETR_A8_8_OUTLINE_W, SIMETR_A8_8_OUTLINE_H)
    extrude(amount=SIMETR_A8_8_DEPTH)

    # Simetr_a8 9 outline → Simetr_a8 9 (add)
    with BuildSketch(Plane.YZ.offset(SIMETR_A8_START_6)):
        Polygon((-48, -215.230368445), (-48, -209.5), (-48.004018959, -209.5), (-48.004018959, -215.5), (-43, -215.5), (-43, -215.230368445), align=None)
    extrude(amount=SIMETR_A8_9_DEPTH)

    # Croquis9 → Saliente-Extruir9 (add)
    with BuildSketch(Plane.ZY.offset(-228)):
        with BuildLine():
            Line((-67.5, -25), (-22.49, -25))
            ThreePointArc((-22.49, -25), (5.794271247, -13.284271247), (17.51, 15))
            Line((17.51, 15), (17.511578112, 48.540917347))
            Line((17.511578112, 48.540917347), (12.51, 51.767741935))
            Line((12.51, 51.767741935), (12.51, 15))
            ThreePointArc((12.51, 15), (2.258737342, -9.748737342), (-22.49, -20))
            Line((-22.49, -20), (-67.5, -20))
            Line((-67.5, -20), (-67.5, -25))
        make_face()
    extrude(amount=SALIENTE_EXTRUIR9_DEPTH)

    # Croquis10 → Saliente-Extruir10 (add)
    with BuildSketch(Plane.XZ.offset(75)):
        with Locations((120, -2.5)):
            Rectangle(CROQUIS10_W, CROQUIS10_H)
    extrude(amount=-SALIENTE_EXTRUIR10_DEPTH)

    # Croquis11 → Saliente-Extruir11 (add)
    with BuildSketch(Plane.XZ.offset(75)):
        Polygon((58.295818619, -36.723516543), (54.795818619, -36.723516543), (51.295818619, -36.723516543), (51.295818619, -37.723516543), (58.295818619, -37.723516543), align=None)
        Polygon((51.295818619, 23.276483457), (54.795818619, 23.276483457), (58.295818619, 23.276483457), (58.295818619, 24.276483457), (51.295818619, 24.276483457), align=None)
        with Locations((184.795818619, 23.776483457)):
            Rectangle(CROQUIS11_W, CROQUIS11_H)
        with Locations((184.795818619, -37.223516543)):
            Rectangle(CROQUIS11_W, CROQUIS11_H)
    extrude(amount=SALIENTE_EXTRUIR11_DEPTH)

    # Croquis12 → Cortar-Extruir1 (cut, through all)
    with BuildSketch(Plane.XY.offset(24.276483457)):
        with Locations((54.795818619, -78.5)):
            Circle(CROQUIS12_R)
        with Locations((184.795818619, -78.5)):
            Circle(CROQUIS12_R)
    extrude(amount=-CORTAR_EXTRUIR1_DEPTH, mode=Mode.SUBTRACT)

    # Croquis13 → Saliente-Extruir13 (add)
    with BuildSketch(Plane(origin=(0, 0, -37.723516543), x_dir=(-1, 0, 0), z_dir=(0, 0, -1))):
        with Locations((-126.829206794, -78.5)):
            Rectangle(CROQUIS13_W, CROQUIS13_H)
    extrude(amount=-SALIENTE_EXTRUIR13_DEPTH)

    # Croquis14 → Saliente-Extruir14 (add)
    with BuildSketch(Plane.XY.offset(24.276483457)):
        with Locations((126.898404195, -78.5)):
            Rectangle(CROQUIS14_W, CROQUIS14_H)
    extrude(amount=-SALIENTE_EXTRUIR14_DEPTH)

    # Croquis15 → Saliente-Extruir15 (add)
    with BuildSketch(Plane.XZ.offset(75)):
        with Locations((123.329206794, 31.776483457)):
            Rectangle(CROQUIS15_W, CROQUIS15_H)
    extrude(amount=SALIENTE_EXTRUIR15_DEPTH)


solid = Compound([body_2.part, part_1.part])
